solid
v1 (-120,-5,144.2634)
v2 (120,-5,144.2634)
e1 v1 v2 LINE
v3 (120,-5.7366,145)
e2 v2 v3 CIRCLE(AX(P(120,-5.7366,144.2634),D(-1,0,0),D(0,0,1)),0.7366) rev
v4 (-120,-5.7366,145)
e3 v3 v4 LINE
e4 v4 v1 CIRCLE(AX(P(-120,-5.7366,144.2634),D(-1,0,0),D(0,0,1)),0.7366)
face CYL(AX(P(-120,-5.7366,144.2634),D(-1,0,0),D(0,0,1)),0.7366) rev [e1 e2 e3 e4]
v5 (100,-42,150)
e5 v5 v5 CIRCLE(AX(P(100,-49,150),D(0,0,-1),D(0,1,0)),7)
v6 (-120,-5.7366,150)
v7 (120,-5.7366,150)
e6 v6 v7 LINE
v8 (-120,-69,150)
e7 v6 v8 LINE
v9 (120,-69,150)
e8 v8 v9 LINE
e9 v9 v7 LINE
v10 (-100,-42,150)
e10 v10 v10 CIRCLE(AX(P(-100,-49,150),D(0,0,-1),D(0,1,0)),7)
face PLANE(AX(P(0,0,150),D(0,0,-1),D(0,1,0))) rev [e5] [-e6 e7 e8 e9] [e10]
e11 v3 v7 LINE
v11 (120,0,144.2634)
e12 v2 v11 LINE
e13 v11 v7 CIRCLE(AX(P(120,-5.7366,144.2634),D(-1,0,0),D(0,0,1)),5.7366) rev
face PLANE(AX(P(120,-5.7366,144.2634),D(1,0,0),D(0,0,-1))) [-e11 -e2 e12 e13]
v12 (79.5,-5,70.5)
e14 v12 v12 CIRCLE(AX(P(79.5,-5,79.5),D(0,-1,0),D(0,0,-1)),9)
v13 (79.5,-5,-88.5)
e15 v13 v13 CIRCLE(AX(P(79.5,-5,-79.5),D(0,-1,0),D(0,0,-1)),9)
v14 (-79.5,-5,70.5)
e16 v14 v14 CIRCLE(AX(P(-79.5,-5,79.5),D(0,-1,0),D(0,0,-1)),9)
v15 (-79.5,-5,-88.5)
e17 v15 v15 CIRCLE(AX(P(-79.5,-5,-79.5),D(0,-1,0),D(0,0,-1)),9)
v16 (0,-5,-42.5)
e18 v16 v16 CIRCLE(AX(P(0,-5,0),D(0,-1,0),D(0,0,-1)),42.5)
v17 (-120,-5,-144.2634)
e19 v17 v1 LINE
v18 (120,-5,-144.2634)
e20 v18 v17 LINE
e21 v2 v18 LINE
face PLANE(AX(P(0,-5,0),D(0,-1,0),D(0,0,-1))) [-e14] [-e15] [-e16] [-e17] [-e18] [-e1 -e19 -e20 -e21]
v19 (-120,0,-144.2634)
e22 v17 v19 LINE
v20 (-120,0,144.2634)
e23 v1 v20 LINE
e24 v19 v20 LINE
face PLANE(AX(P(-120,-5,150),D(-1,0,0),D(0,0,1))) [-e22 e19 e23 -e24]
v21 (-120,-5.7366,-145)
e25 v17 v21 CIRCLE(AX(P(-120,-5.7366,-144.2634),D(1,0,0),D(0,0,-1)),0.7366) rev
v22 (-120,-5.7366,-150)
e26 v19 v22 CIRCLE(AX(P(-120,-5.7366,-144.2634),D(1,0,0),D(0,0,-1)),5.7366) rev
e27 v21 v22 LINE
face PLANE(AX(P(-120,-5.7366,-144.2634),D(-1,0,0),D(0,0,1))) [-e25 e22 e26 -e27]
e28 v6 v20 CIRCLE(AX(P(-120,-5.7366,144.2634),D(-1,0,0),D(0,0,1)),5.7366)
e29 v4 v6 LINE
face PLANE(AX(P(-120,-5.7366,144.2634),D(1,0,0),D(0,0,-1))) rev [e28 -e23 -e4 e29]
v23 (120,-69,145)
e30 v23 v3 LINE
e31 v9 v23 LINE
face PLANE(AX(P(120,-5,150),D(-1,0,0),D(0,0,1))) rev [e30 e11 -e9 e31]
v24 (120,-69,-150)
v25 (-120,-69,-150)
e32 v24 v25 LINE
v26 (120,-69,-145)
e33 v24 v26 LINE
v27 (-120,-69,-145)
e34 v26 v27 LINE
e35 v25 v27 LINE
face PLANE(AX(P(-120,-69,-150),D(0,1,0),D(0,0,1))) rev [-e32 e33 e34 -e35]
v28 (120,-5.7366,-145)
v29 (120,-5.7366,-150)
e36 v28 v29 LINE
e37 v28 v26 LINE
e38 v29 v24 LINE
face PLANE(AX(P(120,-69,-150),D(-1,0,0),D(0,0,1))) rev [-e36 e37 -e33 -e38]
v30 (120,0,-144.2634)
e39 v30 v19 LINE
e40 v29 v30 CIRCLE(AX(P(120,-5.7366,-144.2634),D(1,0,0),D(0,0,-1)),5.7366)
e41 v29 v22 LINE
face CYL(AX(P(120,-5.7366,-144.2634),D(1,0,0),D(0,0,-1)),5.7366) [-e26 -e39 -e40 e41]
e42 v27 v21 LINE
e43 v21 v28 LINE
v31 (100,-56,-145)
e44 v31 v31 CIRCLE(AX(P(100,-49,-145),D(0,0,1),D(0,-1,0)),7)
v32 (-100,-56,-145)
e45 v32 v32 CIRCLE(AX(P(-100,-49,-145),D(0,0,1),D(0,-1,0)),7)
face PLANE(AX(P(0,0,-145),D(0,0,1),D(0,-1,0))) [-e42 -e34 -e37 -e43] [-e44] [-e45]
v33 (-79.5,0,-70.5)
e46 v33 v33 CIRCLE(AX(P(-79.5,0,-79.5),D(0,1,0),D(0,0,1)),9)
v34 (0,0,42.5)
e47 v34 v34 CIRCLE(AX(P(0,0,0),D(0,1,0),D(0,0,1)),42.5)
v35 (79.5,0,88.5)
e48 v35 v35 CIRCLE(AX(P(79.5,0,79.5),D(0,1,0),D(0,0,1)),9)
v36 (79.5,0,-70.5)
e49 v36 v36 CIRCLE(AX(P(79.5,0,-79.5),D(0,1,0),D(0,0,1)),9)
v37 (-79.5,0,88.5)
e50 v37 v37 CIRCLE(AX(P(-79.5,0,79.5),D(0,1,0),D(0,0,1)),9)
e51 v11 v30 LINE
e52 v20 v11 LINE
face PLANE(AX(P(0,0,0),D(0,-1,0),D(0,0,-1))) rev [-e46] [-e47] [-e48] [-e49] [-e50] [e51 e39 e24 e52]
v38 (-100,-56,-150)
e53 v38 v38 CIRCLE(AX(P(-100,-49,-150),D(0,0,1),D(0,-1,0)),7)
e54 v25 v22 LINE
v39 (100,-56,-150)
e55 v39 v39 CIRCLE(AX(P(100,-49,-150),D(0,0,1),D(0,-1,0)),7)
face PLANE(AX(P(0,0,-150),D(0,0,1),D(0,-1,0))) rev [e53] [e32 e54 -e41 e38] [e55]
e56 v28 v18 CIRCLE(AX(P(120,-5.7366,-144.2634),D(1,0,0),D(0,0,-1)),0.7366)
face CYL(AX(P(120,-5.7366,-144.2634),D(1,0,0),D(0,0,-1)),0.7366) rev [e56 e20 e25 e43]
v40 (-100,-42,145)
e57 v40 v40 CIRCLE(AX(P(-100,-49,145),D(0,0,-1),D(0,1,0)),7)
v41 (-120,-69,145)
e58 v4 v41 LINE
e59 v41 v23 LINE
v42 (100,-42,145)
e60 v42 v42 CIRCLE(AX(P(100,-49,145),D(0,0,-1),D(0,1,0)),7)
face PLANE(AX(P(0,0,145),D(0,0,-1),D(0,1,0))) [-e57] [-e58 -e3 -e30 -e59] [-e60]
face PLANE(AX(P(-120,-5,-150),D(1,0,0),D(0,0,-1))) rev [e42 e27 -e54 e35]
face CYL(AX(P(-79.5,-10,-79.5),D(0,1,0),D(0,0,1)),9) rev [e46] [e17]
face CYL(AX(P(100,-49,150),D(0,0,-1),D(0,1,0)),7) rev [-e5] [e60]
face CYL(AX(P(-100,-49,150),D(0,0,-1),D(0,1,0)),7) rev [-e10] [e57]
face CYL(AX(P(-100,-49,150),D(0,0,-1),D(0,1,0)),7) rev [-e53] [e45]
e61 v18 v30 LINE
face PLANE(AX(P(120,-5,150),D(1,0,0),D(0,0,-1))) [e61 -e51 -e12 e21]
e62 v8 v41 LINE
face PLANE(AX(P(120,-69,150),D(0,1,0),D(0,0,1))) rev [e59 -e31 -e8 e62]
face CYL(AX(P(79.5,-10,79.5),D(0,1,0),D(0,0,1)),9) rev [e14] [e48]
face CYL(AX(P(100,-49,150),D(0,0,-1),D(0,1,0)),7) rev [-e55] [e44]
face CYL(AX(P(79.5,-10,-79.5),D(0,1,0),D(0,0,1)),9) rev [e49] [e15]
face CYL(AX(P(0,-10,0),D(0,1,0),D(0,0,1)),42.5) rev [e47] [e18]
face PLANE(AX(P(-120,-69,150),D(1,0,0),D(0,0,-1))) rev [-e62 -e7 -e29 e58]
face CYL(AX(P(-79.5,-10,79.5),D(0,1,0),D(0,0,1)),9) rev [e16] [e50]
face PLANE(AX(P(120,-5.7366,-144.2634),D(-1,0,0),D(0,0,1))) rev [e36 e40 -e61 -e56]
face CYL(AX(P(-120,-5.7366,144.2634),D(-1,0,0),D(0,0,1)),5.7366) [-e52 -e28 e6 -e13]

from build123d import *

# Parameters (mm, degrees)
SKETCH1_W                      = 240
SKETCH1_H                      = 300
BASE_FLANGE1_DEPTH             = 5
EDGE_FLANGE1_STRIP_W           = 21.4732
EDGE_FLANGE1_STRIP_H           = 5
EDGE_FLANGE1_STRIP_CUT_DEPTH   = 240
EDGE_FLANGE1_STRIP_2_W         = 21.4732
EDGE_FLANGE1_STRIP_2_H         = 5
EDGE_FLANGE1_STRIP_CUT_2_DEPTH = 240
EDGE_FLANGE1_DEPTH             = 240
EDGE_FLANGE1_BEND_DEPTH        = 240
CUT_EXTRUDE1_DEPTH             = 331.395217883
CUT_EXTRUDE1_DEPTH_BACK        = 331.395217883
SKETCH12_R                     = 7
SKETCH13_R                     = 42.5
SKETCH13_R_2                   = 9
CUT_EXTRUDE3_DEPTH             = 10


# Sheet-metal steps are written as plain solids
with BuildPart() as part:
    # Sketch1 → Base-Flange1 (new body)
    with BuildSketch(Plane(origin=(0, 0, 0), x_dir=(1, 0, 0), z_dir=(0, 1, 0))):
        Rectangle(SKETCH1_W, SKETCH1_H)
    extrude(amount=-BASE_FLANGE1_DEPTH)

    # Edge-Flange1 strip (across the edge) → Edge-Flange1 strip cut (cut)
    with BuildSketch(Plane(origin=(-120, -5, -150), x_dir=(0, 0, 1), z_dir=(1, 0, 0))):
        with Locations((-5, -2.5)):
            Rectangle(EDGE_FLANGE1_STRIP_W, EDGE_FLANGE1_STRIP_H)
    extrude(amount=EDGE_FLANGE1_STRIP_CUT_DEPTH, mode=Mode.SUBTRACT)

    # Edge-Flange1 strip 2 (across the edge) → Edge-Flange1 strip cut 2 (cut)
    with BuildSketch(Plane(origin=(120, -5, 150), x_dir=(0, 0, -1), z_dir=(-1, 0, 0))):
        with Locations((-5, -2.5)):
            Rectangle(EDGE_FLANGE1_STRIP_2_W, EDGE_FLANGE1_STRIP_2_H)
    extrude(amount=EDGE_FLANGE1_STRIP_CUT_2_DEPTH, mode=Mode.SUBTRACT)

    # Edge-Flange1 section (across the edge) → Edge-Flange1 (add)
    with BuildSketch(Plane(origin=(-120, -5, -150), x_dir=(0, 0, 1), z_dir=(1, 0, 0))):
        with BuildLine():
            Line((0, 0.7366), (0, 64))
            Line((0, 64), (5, 64))
            Line((5, 64), (5, 0.7366))
            ThreePointArc((5, 0.7366), (5.215745145, 0.215745145), (5.7366, 0))
            Line((5.7366, 0), (5.7366, -5))
            ThreePointArc((5.7366, -5), (1.680211239, -3.319788761), (0, 0.7366))
        make_face()
    extrude(amount=EDGE_FLANGE1_DEPTH)

    # Edge-Flange1 section 2 (across the edge) → Edge-Flange1 bend (add)
    with BuildSketch(Plane(origin=(120, -5, 150), x_dir=(0, 0, -1), z_dir=(-1, 0, 0))):
        with BuildLine():
            Line((0, 0.7366), (0, 64))
            Line((0, 64), (5, 64))
            Line((5, 64), (5, 0.7366))
            ThreePointArc((5, 0.7366), (5.215745145, 0.215745145), (5.7366, 0))
            Line((5.7366, 0), (5.7366, -5))
            ThreePointArc((5.7366, -5), (1.680211239, -3.319788761), (0, 0.7366))
        make_face()
    extrude(amount=EDGE_FLANGE1_BEND_DEPTH)

    # Sketch12 → Cut-Extrude1 (cut, two sides: drawn at the far end of the back side and taken through both)
    with BuildSketch(Plane(origin=(0, 0, -150), x_dir=(-1, 0, 0), z_dir=(0, 0, -1)).offset(-CUT_EXTRUDE1_DEPTH_BACK)):
        with Locations(Location((100, -49, 0), (0, 0, 90))):
            Circle(SKETCH12_R)
        with Locations(Location((-100, -49, 0), (0, 0, 90))):
            Circle(SKETCH12_R)
    extrude(amount=CUT_EXTRUDE1_DEPTH + CUT_EXTRUDE1_DEPTH_BACK, mode=Mode.SUBTRACT)

    # Sketch13 → Cut-Extrude3 (cut)
    with BuildSketch(Plane(origin=(0, 0, 0), x_dir=(1, 0, 0), z_dir=(0, 1, 0))):
        with Locations(Location((0, 0, 0), (0, 0, 270))):
            Circle(SKETCH13_R)
        with Locations(Location((79.5, 79.5, 0), (0, 0, 270))):
            Circle(SKETCH13_R_2)
        with Locations(Location((-79.5, 79.5, 0), (0, 0, 270))):
            Circle(SKETCH13_R_2)
        with Locations(Location((-79.5, -79.5, 0), (0, 0, 270))):
            Circle(SKETCH13_R_2)
        with Locations(Location((79.5, -79.5, 0), (0, 0, 270))):
            Circle(SKETCH13_R_2)
    extrude(amount=-CUT_EXTRUDE3_DEPTH, mode=Mode.SUBTRACT)


solid = part.part
